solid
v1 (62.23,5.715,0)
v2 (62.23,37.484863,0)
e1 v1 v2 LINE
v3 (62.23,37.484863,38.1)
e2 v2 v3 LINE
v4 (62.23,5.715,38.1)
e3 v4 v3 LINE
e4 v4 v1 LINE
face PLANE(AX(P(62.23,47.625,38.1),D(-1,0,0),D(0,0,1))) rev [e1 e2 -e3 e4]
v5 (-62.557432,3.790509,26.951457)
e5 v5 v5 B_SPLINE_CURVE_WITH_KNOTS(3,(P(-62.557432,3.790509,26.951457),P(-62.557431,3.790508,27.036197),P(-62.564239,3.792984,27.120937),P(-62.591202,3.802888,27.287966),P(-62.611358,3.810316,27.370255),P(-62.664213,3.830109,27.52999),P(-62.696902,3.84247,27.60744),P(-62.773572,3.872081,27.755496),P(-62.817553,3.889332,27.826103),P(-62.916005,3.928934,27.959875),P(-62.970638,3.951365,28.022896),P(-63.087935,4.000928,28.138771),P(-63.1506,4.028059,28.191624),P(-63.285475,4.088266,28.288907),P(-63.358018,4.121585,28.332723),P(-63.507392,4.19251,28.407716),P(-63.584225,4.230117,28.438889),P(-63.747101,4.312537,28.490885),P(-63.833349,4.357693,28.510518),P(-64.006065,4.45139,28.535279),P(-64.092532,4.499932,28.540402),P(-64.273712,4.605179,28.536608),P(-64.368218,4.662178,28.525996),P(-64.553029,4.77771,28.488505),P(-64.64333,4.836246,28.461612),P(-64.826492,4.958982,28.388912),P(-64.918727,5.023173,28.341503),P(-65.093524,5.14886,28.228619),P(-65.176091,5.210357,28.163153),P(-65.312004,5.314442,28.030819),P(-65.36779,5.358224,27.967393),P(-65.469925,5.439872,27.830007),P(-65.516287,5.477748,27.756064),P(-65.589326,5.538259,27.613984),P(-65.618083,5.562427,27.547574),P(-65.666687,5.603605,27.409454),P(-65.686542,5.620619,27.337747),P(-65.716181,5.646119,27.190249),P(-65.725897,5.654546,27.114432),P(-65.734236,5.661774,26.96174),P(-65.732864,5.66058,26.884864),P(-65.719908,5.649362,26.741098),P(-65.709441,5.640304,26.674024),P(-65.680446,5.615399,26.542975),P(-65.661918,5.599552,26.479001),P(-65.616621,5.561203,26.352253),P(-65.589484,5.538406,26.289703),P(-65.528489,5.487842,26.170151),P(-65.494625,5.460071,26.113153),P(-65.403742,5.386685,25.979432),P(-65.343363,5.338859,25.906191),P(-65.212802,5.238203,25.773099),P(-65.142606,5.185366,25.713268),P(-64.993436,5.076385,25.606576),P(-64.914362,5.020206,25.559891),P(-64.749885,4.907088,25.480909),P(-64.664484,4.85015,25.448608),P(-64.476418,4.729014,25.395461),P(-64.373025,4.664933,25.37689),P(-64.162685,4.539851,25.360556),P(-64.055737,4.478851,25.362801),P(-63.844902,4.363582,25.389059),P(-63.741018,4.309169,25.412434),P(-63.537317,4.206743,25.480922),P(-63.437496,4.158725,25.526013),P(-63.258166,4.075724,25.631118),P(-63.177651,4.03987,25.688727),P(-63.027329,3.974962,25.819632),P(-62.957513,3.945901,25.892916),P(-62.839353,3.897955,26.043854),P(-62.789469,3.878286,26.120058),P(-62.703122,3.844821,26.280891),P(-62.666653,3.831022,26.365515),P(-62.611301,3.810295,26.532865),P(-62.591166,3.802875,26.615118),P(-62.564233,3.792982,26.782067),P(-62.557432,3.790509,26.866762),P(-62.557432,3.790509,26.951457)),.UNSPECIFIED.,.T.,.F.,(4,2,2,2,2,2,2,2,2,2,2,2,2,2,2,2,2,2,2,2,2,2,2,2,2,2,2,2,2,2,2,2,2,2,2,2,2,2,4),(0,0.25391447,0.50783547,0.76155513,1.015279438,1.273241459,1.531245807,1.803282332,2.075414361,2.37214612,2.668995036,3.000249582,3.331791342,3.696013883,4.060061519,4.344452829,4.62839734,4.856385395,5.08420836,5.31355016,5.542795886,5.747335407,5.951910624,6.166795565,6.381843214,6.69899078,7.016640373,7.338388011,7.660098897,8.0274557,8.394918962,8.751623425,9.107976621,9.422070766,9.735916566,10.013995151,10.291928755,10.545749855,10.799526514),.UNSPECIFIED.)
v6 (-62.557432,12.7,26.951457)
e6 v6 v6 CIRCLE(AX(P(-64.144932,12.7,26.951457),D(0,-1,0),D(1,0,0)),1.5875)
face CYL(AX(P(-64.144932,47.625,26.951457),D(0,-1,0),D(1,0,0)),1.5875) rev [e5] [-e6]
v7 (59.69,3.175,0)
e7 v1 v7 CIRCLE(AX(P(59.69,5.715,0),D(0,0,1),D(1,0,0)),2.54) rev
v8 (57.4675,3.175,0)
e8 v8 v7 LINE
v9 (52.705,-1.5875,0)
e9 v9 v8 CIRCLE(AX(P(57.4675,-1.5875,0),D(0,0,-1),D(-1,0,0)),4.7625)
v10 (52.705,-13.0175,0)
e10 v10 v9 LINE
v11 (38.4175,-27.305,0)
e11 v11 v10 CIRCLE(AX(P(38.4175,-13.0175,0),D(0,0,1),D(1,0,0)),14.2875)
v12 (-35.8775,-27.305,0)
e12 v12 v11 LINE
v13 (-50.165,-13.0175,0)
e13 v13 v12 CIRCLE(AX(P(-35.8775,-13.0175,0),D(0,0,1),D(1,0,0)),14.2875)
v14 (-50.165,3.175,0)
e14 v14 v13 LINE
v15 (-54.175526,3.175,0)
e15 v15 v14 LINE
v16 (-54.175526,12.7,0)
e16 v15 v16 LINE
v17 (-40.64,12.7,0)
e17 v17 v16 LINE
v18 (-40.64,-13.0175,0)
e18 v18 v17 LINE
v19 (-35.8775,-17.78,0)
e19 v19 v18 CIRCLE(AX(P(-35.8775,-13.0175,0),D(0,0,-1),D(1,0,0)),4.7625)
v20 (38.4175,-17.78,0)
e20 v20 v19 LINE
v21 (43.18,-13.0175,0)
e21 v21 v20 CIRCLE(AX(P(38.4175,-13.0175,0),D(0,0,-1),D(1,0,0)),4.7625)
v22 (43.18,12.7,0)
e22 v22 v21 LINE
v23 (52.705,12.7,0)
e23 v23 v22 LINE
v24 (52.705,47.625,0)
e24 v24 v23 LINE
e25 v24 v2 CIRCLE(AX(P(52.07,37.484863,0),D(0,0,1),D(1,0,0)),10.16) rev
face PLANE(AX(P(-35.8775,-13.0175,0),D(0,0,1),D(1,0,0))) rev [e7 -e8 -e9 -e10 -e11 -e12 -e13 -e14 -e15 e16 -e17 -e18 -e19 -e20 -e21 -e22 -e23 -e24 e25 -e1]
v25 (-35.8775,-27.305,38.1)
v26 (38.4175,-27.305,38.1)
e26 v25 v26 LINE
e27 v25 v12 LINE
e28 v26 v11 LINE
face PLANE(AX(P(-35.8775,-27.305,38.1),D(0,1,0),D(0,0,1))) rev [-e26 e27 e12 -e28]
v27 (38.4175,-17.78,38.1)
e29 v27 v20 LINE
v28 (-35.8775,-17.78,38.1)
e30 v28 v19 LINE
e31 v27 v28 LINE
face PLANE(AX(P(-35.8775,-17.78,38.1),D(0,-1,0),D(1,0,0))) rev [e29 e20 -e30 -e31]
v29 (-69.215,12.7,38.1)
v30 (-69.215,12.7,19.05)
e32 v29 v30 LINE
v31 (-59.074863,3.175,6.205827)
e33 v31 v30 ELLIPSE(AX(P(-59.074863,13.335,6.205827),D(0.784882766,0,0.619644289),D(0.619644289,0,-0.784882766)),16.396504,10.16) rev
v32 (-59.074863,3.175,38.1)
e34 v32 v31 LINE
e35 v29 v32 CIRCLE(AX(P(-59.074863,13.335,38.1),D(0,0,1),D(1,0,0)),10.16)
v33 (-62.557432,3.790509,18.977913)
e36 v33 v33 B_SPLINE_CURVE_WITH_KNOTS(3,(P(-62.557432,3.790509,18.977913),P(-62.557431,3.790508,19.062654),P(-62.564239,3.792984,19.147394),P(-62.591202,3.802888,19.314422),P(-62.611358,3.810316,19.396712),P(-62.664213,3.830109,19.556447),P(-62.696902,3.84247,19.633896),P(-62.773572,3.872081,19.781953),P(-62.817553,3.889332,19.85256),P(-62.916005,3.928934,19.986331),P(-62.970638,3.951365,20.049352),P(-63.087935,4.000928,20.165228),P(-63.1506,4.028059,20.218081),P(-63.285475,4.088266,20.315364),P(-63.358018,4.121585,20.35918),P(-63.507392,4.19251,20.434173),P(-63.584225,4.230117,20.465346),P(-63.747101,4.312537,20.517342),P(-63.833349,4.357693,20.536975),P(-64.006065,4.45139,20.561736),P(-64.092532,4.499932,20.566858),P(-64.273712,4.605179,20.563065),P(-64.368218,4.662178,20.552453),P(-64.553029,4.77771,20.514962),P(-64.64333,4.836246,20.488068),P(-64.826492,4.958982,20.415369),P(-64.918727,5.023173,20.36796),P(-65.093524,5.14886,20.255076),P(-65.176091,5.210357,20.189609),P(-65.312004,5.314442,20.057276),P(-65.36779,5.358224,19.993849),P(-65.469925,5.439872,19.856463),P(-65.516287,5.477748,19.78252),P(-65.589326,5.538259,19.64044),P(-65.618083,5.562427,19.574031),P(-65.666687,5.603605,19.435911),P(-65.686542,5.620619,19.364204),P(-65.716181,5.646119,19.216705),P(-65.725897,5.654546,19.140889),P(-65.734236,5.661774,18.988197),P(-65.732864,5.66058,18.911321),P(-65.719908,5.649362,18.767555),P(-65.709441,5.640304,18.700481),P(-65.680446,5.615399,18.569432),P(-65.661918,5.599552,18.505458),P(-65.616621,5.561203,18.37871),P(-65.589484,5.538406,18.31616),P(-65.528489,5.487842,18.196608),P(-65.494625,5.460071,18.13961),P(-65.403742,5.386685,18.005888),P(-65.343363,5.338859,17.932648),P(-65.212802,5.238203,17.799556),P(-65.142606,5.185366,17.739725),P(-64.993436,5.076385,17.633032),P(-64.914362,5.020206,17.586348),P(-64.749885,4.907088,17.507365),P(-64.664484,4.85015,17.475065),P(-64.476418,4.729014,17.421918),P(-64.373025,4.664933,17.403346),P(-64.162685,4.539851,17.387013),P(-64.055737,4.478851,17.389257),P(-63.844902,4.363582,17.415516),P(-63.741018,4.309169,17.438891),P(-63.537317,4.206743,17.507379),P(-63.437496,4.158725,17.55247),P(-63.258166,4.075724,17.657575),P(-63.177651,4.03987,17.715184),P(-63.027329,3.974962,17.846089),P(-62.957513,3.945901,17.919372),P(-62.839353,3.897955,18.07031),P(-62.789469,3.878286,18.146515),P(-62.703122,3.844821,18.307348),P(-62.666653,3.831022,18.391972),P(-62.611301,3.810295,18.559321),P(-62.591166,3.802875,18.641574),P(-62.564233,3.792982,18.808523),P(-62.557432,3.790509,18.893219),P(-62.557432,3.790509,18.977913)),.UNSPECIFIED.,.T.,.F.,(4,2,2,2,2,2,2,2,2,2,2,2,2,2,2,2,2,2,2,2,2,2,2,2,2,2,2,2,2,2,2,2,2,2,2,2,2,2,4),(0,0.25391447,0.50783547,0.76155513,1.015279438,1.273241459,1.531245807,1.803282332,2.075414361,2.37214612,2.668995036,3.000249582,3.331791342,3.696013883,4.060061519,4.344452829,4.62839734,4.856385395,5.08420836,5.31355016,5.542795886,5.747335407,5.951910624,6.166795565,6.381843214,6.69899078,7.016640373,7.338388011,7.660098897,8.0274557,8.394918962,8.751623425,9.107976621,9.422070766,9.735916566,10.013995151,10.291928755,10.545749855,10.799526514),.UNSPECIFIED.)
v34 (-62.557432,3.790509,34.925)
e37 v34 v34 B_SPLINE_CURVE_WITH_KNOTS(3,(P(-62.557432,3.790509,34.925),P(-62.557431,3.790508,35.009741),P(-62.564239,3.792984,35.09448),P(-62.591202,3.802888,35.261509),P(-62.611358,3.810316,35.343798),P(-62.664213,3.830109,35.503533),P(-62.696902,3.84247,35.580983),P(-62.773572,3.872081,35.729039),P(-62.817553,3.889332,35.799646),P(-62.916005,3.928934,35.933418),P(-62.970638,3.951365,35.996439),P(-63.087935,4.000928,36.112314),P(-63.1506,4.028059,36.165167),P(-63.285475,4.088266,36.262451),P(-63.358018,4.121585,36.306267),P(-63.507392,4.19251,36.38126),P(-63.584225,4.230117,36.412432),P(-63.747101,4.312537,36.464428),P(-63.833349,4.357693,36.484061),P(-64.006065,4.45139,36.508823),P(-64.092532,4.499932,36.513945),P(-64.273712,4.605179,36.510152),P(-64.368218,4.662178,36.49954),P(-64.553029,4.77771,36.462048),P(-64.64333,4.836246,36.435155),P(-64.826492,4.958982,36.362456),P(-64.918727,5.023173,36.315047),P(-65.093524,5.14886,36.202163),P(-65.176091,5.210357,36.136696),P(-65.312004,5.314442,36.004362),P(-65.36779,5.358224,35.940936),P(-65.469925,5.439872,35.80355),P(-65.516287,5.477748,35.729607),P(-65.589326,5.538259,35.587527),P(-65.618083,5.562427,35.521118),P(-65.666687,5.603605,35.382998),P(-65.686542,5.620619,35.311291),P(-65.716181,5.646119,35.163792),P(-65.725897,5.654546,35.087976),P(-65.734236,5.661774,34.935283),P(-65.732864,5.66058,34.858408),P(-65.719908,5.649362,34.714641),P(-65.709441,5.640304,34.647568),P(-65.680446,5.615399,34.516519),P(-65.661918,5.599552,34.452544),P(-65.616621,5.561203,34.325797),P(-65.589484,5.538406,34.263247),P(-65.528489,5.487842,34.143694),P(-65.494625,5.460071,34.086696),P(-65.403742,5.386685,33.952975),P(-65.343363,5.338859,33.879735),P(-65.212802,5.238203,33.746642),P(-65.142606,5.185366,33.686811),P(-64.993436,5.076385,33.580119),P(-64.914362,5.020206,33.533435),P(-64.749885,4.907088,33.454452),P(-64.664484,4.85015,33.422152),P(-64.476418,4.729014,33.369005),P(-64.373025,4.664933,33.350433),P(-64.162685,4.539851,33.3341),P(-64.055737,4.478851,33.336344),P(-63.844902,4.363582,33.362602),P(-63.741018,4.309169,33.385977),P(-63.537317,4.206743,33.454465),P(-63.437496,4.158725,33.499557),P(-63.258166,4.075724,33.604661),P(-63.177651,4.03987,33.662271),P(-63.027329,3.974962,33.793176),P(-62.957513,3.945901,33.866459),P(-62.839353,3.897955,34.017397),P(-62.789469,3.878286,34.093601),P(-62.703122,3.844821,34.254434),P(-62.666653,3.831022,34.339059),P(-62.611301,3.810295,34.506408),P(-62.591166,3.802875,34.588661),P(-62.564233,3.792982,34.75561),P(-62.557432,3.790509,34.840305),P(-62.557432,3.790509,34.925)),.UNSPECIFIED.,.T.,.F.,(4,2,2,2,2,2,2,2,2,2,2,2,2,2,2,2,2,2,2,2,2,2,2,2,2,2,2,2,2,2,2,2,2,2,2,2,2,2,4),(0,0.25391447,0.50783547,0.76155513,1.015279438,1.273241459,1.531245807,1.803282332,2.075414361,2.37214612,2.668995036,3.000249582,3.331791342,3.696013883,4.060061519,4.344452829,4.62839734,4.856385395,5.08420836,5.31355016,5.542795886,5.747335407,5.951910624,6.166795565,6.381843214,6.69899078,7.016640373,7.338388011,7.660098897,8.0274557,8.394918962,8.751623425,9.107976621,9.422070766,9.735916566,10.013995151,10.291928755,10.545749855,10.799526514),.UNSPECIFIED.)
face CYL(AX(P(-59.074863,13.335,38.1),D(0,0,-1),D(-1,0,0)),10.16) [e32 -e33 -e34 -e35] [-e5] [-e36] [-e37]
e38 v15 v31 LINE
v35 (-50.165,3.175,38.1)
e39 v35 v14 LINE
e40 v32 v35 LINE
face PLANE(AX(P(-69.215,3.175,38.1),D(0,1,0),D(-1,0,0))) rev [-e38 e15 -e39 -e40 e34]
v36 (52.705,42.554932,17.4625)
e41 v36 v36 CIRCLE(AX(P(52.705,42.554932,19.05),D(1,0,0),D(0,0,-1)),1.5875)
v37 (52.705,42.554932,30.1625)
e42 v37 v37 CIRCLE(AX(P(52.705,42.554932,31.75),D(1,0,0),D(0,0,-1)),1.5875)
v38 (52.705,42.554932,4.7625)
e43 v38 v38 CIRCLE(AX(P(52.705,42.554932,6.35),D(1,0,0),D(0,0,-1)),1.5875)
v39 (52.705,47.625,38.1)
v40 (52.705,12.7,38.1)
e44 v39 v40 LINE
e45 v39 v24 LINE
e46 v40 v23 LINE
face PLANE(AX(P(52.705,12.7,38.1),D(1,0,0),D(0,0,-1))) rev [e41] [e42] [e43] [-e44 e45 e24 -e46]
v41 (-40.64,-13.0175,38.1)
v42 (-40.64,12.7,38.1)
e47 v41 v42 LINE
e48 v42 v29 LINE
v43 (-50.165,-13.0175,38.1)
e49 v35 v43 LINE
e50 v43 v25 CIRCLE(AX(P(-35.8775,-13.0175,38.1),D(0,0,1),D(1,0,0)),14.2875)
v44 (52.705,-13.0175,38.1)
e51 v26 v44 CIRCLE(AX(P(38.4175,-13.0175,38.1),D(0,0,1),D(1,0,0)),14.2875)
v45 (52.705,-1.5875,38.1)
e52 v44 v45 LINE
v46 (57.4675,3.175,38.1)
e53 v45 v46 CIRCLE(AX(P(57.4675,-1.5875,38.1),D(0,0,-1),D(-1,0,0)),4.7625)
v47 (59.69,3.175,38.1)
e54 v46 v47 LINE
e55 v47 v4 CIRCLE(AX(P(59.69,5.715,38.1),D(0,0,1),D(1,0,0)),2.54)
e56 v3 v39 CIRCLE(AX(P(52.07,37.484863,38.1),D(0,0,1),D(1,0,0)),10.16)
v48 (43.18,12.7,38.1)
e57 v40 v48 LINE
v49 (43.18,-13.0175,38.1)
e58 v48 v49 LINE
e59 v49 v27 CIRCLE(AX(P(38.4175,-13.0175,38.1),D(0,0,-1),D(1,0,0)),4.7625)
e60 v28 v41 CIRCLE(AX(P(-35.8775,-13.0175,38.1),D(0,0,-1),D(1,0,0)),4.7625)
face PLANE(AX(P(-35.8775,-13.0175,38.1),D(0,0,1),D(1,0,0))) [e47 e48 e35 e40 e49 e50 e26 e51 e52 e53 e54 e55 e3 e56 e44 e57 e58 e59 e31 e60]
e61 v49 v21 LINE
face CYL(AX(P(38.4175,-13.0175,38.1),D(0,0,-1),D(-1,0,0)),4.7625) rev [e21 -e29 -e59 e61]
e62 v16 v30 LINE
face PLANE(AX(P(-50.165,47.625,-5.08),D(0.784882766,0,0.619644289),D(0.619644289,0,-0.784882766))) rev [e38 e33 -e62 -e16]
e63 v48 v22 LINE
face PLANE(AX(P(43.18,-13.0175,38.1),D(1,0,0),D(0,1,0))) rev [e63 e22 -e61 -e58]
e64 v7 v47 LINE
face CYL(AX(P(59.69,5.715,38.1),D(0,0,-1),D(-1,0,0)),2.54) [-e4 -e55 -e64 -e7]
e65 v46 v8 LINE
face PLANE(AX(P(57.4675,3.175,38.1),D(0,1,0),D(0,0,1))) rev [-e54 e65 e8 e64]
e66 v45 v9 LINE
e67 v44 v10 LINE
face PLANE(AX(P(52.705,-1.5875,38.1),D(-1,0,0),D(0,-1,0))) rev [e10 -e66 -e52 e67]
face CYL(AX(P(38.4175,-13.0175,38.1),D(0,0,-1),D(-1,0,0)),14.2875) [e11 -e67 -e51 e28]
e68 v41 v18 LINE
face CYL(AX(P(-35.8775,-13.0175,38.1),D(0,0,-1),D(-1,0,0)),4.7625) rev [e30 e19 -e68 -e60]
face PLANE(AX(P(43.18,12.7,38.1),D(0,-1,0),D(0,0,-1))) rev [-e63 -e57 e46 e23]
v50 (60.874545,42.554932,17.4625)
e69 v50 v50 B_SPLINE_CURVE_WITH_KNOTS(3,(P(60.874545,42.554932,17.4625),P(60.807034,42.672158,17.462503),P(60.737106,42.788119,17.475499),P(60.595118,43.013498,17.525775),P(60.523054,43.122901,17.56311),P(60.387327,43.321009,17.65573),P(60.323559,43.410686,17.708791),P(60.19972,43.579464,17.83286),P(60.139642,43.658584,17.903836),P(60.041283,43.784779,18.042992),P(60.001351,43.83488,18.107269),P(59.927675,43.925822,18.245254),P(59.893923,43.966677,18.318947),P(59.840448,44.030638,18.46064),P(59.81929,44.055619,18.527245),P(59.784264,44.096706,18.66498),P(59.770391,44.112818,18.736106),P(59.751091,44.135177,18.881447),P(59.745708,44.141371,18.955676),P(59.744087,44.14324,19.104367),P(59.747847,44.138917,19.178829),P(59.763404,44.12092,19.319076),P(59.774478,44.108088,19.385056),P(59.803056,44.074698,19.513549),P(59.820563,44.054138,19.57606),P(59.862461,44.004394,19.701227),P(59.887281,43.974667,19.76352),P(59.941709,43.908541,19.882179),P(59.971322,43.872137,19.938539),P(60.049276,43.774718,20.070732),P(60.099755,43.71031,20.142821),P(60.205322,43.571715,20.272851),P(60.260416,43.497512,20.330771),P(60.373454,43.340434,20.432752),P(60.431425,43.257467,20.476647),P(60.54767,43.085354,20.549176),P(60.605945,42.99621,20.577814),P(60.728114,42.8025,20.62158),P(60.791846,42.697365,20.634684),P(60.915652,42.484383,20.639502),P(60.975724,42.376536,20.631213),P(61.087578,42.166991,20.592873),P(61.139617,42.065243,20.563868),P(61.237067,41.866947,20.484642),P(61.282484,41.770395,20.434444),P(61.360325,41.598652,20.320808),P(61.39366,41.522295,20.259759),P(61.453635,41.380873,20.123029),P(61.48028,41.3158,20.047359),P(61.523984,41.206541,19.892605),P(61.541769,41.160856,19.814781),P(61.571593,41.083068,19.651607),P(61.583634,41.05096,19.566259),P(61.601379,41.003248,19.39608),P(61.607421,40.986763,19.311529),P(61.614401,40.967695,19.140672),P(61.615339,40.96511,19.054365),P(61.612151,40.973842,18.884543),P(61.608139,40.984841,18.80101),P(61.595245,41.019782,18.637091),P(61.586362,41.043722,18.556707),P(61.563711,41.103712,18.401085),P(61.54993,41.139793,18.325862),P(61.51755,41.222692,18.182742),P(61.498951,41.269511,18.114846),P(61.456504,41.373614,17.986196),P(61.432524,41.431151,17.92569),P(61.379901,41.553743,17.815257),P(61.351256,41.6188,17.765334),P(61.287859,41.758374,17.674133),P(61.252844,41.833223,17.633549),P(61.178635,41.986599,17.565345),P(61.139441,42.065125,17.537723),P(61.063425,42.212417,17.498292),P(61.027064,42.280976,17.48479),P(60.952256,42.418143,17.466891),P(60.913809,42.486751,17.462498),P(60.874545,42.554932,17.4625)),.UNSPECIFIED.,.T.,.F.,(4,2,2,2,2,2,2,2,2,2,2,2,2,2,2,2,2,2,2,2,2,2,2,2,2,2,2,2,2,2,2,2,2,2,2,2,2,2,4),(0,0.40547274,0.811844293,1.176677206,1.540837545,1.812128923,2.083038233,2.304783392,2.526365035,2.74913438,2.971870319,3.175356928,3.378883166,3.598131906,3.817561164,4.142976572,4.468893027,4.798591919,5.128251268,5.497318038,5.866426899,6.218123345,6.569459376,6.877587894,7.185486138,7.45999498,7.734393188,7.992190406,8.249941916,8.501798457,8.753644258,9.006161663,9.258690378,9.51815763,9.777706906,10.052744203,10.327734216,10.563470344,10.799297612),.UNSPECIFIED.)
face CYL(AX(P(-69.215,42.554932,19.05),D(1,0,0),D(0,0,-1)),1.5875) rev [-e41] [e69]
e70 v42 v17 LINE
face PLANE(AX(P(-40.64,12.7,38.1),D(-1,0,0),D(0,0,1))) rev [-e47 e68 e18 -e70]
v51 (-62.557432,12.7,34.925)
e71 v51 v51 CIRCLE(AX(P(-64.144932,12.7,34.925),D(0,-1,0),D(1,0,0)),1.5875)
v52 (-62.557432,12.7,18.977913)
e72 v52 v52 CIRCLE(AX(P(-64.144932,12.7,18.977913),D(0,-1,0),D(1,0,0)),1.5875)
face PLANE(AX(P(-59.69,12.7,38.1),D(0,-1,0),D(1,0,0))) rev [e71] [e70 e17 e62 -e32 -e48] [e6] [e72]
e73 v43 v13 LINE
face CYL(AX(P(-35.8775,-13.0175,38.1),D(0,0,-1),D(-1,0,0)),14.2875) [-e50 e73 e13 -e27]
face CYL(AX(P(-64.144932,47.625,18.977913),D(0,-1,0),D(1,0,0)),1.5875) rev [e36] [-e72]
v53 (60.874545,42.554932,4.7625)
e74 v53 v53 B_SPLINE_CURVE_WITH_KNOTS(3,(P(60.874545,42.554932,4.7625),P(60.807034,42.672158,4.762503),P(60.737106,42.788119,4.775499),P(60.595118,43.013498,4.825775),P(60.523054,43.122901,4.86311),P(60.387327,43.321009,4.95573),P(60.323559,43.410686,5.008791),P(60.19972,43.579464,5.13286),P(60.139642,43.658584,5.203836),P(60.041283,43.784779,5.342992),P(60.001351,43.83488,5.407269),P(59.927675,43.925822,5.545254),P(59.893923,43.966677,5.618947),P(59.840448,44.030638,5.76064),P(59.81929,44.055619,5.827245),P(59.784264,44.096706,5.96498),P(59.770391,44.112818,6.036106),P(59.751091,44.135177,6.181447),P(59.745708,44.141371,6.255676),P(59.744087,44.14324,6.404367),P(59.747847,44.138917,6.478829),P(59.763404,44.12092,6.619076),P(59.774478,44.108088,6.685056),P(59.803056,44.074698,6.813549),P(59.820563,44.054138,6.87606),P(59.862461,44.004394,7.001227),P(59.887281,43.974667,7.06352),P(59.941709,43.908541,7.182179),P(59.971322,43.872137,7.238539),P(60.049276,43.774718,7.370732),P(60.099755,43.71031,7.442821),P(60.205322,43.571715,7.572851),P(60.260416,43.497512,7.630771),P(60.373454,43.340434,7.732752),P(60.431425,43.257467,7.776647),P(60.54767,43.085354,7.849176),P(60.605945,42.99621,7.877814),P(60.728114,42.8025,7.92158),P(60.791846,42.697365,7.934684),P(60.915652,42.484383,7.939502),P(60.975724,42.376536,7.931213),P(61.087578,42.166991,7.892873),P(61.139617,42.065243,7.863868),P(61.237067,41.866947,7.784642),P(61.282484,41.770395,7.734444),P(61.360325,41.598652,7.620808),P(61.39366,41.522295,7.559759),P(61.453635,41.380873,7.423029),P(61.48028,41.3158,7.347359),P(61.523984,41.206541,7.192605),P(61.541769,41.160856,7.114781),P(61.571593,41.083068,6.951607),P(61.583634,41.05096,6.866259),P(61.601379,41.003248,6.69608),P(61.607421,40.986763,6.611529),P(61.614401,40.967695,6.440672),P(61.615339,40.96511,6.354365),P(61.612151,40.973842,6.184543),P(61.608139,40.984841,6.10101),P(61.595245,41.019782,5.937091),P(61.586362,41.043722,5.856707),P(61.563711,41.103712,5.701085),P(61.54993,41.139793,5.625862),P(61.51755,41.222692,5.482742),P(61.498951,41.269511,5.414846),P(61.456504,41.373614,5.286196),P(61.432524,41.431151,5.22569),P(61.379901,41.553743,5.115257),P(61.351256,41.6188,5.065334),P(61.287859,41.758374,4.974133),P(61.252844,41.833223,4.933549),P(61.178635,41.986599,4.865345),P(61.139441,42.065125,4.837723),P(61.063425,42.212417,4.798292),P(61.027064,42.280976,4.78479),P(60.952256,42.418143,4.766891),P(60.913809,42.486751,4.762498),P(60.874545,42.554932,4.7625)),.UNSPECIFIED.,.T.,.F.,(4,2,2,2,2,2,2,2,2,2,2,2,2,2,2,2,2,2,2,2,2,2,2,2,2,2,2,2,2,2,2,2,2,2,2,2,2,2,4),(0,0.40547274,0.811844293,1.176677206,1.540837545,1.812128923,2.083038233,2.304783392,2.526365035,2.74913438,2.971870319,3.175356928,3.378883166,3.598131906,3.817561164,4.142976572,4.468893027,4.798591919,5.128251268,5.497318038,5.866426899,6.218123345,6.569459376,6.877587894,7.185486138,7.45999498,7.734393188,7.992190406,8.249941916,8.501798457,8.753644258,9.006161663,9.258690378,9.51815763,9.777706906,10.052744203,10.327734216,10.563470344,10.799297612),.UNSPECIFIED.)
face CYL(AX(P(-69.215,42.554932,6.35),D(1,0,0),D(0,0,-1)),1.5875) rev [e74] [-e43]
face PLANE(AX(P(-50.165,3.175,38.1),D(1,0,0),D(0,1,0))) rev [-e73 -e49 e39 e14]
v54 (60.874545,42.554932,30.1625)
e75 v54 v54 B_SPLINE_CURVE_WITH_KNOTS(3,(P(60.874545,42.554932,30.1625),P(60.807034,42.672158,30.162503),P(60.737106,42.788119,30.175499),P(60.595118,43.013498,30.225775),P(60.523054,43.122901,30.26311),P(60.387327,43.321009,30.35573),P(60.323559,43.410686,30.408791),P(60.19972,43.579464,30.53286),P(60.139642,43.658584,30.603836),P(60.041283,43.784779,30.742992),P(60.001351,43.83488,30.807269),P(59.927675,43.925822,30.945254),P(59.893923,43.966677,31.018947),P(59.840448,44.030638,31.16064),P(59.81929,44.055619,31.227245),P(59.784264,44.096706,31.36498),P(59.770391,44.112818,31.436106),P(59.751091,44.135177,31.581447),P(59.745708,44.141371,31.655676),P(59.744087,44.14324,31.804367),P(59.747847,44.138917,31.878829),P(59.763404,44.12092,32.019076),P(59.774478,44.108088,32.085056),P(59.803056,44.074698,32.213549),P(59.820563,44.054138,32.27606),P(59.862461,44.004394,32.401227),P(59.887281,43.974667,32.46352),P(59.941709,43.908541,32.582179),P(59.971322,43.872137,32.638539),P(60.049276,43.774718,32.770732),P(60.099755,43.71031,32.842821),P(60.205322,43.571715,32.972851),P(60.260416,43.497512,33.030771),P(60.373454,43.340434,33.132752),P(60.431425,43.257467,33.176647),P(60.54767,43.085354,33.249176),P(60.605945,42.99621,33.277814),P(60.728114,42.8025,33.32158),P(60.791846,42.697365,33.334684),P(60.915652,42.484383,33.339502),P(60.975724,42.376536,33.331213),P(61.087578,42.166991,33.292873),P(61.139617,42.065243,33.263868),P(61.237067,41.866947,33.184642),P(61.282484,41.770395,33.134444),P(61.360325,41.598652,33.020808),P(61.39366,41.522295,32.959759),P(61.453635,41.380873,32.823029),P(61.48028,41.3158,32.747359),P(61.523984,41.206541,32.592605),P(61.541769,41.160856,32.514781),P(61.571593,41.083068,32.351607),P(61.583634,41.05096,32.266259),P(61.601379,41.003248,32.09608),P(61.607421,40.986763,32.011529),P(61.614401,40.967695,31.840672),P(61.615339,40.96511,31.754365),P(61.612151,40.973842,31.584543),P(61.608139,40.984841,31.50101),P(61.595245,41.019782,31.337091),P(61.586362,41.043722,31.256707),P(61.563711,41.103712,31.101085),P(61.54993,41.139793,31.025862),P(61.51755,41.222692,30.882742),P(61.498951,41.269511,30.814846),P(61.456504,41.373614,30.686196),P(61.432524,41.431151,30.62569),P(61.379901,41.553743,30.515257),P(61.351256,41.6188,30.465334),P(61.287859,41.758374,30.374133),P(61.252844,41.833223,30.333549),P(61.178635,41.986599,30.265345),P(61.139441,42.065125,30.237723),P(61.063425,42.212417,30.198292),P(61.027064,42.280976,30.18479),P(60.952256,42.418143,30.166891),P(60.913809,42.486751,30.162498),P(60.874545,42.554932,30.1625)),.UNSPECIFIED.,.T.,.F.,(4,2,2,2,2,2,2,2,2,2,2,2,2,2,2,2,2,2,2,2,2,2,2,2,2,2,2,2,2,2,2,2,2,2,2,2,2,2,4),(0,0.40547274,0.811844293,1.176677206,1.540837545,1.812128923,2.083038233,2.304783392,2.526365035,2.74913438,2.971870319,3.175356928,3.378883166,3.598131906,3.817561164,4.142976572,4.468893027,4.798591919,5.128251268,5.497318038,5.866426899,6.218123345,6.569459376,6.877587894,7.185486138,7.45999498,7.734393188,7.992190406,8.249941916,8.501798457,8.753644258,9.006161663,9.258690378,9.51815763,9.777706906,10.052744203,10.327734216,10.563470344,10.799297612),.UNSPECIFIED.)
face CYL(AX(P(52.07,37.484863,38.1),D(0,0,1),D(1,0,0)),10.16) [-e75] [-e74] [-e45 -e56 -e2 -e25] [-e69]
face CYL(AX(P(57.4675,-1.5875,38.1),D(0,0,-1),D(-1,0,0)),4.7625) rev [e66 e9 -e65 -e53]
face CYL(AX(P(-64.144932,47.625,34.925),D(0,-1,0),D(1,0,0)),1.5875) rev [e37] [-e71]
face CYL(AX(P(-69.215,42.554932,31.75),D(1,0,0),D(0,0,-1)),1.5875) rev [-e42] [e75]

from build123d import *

# Parameters (mm, degrees)
BOSS_EXTRUDE1_DEPTH = 38.1
FILLET1_R           = 2.54
FILLET2_R           = 10.16
CUT_EXTRUDE2_DEPTH  = 91.653895256
SKETCH3_R           = 1.5875
CUT_EXTRUDE3_DEPTH  = 145.905274749
SKETCH4_R           = 1.5875
CUT_EXTRUDE4_DEPTH  = 91.653895347


with BuildPart() as part:
    # Sketch1 → Boss-Extrude1 (new body)
    with BuildSketch(Plane.XY):
        with BuildLine():
            Line((-35.8775, -27.305), (38.4175, -27.305))
            ThreePointArc((38.4175, -27.305), (48.520288136, -23.120288136), (52.705, -13.0175))
            Line((52.705, -13.0175), (52.705, -1.5875))
            ThreePointArc((52.705, -1.5875), (54.099903955, 1.780096045), (57.4675, 3.175))
            Line((57.4675, 3.175), (62.23, 3.175))
            Line((62.23, 3.175), (62.23, 47.625))
            Line((62.23, 47.625), (52.705, 47.625))
            Line((52.705, 47.625), (52.705, 12.7))
            Line((52.705, 12.7), (43.18, 12.7))
            Line((43.18, 12.7), (43.18, -13.0175))
            ThreePointArc((43.18, -13.0175), (41.785096045, -16.385096045), (38.4175, -17.78))
            Line((38.4175, -17.78), (-35.8775, -17.78))
            ThreePointArc((-35.8775, -17.78), (-39.245096045, -16.385096045), (-40.64, -13.0175))
            Line((-40.64, -13.0175), (-40.64, 12.7))
            Line((-40.64, 12.7), (-50.165, 12.7))
            Line((-50.165, 12.7), (-59.69, 12.7))
            Line((-59.69, 12.7), (-69.215, 12.7))
            Line((-69.215, 12.7), (-69.215, 3.175))
            Line((-69.215, 3.175), (-50.165, 3.175))
            Line((-50.165, 3.175), (-50.165, -13.0175))
            ThreePointArc((-50.165, -13.0175), (-45.980288136, -23.120288136), (-35.8775, -27.305))
        make_face()
    extrude(amount=BOSS_EXTRUDE1_DEPTH)

    # Fillet1
    fillet1_edges = [part.edges().sort_by_distance(p)[0] for p in [
        (62.23, 3.175, 19.05),
    ]]
    fillet(fillet1_edges, radius=FILLET1_R)

    # Fillet2
    # the kernel refuses this fillet: 10.16 mm, written as the material it takes off along each edge
    with BuildSketch(Plane(origin=(-69.215, 3.175, -25.350342083), x_dir=(1, 0, 0), z_dir=(0, 0, 1))) as fillet2_piece_1:
        with BuildLine():
            CenterArc((10.140136833, 10.16), FILLET2_R, 183.583321698, 86.416678302)
            Line((0, 9.525), (-0.202802737, 9.5123))
            ThreePointArc((-0.202802737, 9.5123), (-0.2032, 4.7625), (-0.2032, 0))
            Line((-0.2032, 0), (0, -0.2032))
            Line((0, -0.2032), (10.140136833, -0.2032))
            Line((10.140136833, -0.2032), (10.140136833, 0))
        make_face()
    extrude(amount=88.800684167, mode=Mode.SUBTRACT)
    with BuildSketch(Plane(origin=(62.23, 47.625, -25.350342083), x_dir=(0, -1, 0), z_dir=(0, 0, 1))) as fillet2_piece_2:
        with BuildLine():
            CenterArc((10.140136833, -10.16), FILLET2_R, 90, 86.416678302)
            Line((0, -9.525), (-0.202802737, -9.5123))
            ThreePointArc((-0.202802737, -9.5123), (-0.2032, -4.7625), (-0.2032, 0))
            Line((-0.2032, 0), (0, 0.2032))
            Line((0, 0.2032), (10.140136833, 0.2032))
            Line((10.140136833, 0.2032), (10.140136833, 0))
        make_face()
    extrude(amount=88.800684167, mode=Mode.SUBTRACT)

    # Sketch2 → Cut-Extrude2 (cut, through all)
    with BuildSketch(Plane.XZ.offset(-3.175)):
        Polygon((-69.215, -5.08), (-50.165, -5.08), (-69.215, 19.05), align=None)
    extrude(amount=-CUT_EXTRUDE2_DEPTH, mode=Mode.SUBTRACT)

    # Sketch3 → Cut-Extrude3 (cut, through all)
    with BuildSketch(Plane(origin=(62.23, 0, 0), x_dir=(0, 0, -1), z_dir=(1, 0, 0))):
        with Locations((-6.35, 42.554931583)):
            Circle(SKETCH3_R)
        with Locations((-19.05, 42.554931583)):
            Circle(SKETCH3_R)
        with Locations((-31.75, 42.554931583)):
            Circle(SKETCH3_R)
    extrude(amount=-CUT_EXTRUDE3_DEPTH, mode=Mode.SUBTRACT)

    # Sketch4 → Cut-Extrude4 (cut, through all)
    with BuildSketch(Plane.XZ.offset(-3.175)):
        with Locations((-64.144931583, 34.925)):
            Circle(SKETCH4_R)
        with Locations((-64.144931583, 26.951456669)):
            Circle(SKETCH4_R)
        with Locations((-64.144931583, 18.977913339)):
            Circle(SKETCH4_R)
    extrude(amount=-CUT_EXTRUDE4_DEPTH, mode=Mode.SUBTRACT)


solid = part.part
